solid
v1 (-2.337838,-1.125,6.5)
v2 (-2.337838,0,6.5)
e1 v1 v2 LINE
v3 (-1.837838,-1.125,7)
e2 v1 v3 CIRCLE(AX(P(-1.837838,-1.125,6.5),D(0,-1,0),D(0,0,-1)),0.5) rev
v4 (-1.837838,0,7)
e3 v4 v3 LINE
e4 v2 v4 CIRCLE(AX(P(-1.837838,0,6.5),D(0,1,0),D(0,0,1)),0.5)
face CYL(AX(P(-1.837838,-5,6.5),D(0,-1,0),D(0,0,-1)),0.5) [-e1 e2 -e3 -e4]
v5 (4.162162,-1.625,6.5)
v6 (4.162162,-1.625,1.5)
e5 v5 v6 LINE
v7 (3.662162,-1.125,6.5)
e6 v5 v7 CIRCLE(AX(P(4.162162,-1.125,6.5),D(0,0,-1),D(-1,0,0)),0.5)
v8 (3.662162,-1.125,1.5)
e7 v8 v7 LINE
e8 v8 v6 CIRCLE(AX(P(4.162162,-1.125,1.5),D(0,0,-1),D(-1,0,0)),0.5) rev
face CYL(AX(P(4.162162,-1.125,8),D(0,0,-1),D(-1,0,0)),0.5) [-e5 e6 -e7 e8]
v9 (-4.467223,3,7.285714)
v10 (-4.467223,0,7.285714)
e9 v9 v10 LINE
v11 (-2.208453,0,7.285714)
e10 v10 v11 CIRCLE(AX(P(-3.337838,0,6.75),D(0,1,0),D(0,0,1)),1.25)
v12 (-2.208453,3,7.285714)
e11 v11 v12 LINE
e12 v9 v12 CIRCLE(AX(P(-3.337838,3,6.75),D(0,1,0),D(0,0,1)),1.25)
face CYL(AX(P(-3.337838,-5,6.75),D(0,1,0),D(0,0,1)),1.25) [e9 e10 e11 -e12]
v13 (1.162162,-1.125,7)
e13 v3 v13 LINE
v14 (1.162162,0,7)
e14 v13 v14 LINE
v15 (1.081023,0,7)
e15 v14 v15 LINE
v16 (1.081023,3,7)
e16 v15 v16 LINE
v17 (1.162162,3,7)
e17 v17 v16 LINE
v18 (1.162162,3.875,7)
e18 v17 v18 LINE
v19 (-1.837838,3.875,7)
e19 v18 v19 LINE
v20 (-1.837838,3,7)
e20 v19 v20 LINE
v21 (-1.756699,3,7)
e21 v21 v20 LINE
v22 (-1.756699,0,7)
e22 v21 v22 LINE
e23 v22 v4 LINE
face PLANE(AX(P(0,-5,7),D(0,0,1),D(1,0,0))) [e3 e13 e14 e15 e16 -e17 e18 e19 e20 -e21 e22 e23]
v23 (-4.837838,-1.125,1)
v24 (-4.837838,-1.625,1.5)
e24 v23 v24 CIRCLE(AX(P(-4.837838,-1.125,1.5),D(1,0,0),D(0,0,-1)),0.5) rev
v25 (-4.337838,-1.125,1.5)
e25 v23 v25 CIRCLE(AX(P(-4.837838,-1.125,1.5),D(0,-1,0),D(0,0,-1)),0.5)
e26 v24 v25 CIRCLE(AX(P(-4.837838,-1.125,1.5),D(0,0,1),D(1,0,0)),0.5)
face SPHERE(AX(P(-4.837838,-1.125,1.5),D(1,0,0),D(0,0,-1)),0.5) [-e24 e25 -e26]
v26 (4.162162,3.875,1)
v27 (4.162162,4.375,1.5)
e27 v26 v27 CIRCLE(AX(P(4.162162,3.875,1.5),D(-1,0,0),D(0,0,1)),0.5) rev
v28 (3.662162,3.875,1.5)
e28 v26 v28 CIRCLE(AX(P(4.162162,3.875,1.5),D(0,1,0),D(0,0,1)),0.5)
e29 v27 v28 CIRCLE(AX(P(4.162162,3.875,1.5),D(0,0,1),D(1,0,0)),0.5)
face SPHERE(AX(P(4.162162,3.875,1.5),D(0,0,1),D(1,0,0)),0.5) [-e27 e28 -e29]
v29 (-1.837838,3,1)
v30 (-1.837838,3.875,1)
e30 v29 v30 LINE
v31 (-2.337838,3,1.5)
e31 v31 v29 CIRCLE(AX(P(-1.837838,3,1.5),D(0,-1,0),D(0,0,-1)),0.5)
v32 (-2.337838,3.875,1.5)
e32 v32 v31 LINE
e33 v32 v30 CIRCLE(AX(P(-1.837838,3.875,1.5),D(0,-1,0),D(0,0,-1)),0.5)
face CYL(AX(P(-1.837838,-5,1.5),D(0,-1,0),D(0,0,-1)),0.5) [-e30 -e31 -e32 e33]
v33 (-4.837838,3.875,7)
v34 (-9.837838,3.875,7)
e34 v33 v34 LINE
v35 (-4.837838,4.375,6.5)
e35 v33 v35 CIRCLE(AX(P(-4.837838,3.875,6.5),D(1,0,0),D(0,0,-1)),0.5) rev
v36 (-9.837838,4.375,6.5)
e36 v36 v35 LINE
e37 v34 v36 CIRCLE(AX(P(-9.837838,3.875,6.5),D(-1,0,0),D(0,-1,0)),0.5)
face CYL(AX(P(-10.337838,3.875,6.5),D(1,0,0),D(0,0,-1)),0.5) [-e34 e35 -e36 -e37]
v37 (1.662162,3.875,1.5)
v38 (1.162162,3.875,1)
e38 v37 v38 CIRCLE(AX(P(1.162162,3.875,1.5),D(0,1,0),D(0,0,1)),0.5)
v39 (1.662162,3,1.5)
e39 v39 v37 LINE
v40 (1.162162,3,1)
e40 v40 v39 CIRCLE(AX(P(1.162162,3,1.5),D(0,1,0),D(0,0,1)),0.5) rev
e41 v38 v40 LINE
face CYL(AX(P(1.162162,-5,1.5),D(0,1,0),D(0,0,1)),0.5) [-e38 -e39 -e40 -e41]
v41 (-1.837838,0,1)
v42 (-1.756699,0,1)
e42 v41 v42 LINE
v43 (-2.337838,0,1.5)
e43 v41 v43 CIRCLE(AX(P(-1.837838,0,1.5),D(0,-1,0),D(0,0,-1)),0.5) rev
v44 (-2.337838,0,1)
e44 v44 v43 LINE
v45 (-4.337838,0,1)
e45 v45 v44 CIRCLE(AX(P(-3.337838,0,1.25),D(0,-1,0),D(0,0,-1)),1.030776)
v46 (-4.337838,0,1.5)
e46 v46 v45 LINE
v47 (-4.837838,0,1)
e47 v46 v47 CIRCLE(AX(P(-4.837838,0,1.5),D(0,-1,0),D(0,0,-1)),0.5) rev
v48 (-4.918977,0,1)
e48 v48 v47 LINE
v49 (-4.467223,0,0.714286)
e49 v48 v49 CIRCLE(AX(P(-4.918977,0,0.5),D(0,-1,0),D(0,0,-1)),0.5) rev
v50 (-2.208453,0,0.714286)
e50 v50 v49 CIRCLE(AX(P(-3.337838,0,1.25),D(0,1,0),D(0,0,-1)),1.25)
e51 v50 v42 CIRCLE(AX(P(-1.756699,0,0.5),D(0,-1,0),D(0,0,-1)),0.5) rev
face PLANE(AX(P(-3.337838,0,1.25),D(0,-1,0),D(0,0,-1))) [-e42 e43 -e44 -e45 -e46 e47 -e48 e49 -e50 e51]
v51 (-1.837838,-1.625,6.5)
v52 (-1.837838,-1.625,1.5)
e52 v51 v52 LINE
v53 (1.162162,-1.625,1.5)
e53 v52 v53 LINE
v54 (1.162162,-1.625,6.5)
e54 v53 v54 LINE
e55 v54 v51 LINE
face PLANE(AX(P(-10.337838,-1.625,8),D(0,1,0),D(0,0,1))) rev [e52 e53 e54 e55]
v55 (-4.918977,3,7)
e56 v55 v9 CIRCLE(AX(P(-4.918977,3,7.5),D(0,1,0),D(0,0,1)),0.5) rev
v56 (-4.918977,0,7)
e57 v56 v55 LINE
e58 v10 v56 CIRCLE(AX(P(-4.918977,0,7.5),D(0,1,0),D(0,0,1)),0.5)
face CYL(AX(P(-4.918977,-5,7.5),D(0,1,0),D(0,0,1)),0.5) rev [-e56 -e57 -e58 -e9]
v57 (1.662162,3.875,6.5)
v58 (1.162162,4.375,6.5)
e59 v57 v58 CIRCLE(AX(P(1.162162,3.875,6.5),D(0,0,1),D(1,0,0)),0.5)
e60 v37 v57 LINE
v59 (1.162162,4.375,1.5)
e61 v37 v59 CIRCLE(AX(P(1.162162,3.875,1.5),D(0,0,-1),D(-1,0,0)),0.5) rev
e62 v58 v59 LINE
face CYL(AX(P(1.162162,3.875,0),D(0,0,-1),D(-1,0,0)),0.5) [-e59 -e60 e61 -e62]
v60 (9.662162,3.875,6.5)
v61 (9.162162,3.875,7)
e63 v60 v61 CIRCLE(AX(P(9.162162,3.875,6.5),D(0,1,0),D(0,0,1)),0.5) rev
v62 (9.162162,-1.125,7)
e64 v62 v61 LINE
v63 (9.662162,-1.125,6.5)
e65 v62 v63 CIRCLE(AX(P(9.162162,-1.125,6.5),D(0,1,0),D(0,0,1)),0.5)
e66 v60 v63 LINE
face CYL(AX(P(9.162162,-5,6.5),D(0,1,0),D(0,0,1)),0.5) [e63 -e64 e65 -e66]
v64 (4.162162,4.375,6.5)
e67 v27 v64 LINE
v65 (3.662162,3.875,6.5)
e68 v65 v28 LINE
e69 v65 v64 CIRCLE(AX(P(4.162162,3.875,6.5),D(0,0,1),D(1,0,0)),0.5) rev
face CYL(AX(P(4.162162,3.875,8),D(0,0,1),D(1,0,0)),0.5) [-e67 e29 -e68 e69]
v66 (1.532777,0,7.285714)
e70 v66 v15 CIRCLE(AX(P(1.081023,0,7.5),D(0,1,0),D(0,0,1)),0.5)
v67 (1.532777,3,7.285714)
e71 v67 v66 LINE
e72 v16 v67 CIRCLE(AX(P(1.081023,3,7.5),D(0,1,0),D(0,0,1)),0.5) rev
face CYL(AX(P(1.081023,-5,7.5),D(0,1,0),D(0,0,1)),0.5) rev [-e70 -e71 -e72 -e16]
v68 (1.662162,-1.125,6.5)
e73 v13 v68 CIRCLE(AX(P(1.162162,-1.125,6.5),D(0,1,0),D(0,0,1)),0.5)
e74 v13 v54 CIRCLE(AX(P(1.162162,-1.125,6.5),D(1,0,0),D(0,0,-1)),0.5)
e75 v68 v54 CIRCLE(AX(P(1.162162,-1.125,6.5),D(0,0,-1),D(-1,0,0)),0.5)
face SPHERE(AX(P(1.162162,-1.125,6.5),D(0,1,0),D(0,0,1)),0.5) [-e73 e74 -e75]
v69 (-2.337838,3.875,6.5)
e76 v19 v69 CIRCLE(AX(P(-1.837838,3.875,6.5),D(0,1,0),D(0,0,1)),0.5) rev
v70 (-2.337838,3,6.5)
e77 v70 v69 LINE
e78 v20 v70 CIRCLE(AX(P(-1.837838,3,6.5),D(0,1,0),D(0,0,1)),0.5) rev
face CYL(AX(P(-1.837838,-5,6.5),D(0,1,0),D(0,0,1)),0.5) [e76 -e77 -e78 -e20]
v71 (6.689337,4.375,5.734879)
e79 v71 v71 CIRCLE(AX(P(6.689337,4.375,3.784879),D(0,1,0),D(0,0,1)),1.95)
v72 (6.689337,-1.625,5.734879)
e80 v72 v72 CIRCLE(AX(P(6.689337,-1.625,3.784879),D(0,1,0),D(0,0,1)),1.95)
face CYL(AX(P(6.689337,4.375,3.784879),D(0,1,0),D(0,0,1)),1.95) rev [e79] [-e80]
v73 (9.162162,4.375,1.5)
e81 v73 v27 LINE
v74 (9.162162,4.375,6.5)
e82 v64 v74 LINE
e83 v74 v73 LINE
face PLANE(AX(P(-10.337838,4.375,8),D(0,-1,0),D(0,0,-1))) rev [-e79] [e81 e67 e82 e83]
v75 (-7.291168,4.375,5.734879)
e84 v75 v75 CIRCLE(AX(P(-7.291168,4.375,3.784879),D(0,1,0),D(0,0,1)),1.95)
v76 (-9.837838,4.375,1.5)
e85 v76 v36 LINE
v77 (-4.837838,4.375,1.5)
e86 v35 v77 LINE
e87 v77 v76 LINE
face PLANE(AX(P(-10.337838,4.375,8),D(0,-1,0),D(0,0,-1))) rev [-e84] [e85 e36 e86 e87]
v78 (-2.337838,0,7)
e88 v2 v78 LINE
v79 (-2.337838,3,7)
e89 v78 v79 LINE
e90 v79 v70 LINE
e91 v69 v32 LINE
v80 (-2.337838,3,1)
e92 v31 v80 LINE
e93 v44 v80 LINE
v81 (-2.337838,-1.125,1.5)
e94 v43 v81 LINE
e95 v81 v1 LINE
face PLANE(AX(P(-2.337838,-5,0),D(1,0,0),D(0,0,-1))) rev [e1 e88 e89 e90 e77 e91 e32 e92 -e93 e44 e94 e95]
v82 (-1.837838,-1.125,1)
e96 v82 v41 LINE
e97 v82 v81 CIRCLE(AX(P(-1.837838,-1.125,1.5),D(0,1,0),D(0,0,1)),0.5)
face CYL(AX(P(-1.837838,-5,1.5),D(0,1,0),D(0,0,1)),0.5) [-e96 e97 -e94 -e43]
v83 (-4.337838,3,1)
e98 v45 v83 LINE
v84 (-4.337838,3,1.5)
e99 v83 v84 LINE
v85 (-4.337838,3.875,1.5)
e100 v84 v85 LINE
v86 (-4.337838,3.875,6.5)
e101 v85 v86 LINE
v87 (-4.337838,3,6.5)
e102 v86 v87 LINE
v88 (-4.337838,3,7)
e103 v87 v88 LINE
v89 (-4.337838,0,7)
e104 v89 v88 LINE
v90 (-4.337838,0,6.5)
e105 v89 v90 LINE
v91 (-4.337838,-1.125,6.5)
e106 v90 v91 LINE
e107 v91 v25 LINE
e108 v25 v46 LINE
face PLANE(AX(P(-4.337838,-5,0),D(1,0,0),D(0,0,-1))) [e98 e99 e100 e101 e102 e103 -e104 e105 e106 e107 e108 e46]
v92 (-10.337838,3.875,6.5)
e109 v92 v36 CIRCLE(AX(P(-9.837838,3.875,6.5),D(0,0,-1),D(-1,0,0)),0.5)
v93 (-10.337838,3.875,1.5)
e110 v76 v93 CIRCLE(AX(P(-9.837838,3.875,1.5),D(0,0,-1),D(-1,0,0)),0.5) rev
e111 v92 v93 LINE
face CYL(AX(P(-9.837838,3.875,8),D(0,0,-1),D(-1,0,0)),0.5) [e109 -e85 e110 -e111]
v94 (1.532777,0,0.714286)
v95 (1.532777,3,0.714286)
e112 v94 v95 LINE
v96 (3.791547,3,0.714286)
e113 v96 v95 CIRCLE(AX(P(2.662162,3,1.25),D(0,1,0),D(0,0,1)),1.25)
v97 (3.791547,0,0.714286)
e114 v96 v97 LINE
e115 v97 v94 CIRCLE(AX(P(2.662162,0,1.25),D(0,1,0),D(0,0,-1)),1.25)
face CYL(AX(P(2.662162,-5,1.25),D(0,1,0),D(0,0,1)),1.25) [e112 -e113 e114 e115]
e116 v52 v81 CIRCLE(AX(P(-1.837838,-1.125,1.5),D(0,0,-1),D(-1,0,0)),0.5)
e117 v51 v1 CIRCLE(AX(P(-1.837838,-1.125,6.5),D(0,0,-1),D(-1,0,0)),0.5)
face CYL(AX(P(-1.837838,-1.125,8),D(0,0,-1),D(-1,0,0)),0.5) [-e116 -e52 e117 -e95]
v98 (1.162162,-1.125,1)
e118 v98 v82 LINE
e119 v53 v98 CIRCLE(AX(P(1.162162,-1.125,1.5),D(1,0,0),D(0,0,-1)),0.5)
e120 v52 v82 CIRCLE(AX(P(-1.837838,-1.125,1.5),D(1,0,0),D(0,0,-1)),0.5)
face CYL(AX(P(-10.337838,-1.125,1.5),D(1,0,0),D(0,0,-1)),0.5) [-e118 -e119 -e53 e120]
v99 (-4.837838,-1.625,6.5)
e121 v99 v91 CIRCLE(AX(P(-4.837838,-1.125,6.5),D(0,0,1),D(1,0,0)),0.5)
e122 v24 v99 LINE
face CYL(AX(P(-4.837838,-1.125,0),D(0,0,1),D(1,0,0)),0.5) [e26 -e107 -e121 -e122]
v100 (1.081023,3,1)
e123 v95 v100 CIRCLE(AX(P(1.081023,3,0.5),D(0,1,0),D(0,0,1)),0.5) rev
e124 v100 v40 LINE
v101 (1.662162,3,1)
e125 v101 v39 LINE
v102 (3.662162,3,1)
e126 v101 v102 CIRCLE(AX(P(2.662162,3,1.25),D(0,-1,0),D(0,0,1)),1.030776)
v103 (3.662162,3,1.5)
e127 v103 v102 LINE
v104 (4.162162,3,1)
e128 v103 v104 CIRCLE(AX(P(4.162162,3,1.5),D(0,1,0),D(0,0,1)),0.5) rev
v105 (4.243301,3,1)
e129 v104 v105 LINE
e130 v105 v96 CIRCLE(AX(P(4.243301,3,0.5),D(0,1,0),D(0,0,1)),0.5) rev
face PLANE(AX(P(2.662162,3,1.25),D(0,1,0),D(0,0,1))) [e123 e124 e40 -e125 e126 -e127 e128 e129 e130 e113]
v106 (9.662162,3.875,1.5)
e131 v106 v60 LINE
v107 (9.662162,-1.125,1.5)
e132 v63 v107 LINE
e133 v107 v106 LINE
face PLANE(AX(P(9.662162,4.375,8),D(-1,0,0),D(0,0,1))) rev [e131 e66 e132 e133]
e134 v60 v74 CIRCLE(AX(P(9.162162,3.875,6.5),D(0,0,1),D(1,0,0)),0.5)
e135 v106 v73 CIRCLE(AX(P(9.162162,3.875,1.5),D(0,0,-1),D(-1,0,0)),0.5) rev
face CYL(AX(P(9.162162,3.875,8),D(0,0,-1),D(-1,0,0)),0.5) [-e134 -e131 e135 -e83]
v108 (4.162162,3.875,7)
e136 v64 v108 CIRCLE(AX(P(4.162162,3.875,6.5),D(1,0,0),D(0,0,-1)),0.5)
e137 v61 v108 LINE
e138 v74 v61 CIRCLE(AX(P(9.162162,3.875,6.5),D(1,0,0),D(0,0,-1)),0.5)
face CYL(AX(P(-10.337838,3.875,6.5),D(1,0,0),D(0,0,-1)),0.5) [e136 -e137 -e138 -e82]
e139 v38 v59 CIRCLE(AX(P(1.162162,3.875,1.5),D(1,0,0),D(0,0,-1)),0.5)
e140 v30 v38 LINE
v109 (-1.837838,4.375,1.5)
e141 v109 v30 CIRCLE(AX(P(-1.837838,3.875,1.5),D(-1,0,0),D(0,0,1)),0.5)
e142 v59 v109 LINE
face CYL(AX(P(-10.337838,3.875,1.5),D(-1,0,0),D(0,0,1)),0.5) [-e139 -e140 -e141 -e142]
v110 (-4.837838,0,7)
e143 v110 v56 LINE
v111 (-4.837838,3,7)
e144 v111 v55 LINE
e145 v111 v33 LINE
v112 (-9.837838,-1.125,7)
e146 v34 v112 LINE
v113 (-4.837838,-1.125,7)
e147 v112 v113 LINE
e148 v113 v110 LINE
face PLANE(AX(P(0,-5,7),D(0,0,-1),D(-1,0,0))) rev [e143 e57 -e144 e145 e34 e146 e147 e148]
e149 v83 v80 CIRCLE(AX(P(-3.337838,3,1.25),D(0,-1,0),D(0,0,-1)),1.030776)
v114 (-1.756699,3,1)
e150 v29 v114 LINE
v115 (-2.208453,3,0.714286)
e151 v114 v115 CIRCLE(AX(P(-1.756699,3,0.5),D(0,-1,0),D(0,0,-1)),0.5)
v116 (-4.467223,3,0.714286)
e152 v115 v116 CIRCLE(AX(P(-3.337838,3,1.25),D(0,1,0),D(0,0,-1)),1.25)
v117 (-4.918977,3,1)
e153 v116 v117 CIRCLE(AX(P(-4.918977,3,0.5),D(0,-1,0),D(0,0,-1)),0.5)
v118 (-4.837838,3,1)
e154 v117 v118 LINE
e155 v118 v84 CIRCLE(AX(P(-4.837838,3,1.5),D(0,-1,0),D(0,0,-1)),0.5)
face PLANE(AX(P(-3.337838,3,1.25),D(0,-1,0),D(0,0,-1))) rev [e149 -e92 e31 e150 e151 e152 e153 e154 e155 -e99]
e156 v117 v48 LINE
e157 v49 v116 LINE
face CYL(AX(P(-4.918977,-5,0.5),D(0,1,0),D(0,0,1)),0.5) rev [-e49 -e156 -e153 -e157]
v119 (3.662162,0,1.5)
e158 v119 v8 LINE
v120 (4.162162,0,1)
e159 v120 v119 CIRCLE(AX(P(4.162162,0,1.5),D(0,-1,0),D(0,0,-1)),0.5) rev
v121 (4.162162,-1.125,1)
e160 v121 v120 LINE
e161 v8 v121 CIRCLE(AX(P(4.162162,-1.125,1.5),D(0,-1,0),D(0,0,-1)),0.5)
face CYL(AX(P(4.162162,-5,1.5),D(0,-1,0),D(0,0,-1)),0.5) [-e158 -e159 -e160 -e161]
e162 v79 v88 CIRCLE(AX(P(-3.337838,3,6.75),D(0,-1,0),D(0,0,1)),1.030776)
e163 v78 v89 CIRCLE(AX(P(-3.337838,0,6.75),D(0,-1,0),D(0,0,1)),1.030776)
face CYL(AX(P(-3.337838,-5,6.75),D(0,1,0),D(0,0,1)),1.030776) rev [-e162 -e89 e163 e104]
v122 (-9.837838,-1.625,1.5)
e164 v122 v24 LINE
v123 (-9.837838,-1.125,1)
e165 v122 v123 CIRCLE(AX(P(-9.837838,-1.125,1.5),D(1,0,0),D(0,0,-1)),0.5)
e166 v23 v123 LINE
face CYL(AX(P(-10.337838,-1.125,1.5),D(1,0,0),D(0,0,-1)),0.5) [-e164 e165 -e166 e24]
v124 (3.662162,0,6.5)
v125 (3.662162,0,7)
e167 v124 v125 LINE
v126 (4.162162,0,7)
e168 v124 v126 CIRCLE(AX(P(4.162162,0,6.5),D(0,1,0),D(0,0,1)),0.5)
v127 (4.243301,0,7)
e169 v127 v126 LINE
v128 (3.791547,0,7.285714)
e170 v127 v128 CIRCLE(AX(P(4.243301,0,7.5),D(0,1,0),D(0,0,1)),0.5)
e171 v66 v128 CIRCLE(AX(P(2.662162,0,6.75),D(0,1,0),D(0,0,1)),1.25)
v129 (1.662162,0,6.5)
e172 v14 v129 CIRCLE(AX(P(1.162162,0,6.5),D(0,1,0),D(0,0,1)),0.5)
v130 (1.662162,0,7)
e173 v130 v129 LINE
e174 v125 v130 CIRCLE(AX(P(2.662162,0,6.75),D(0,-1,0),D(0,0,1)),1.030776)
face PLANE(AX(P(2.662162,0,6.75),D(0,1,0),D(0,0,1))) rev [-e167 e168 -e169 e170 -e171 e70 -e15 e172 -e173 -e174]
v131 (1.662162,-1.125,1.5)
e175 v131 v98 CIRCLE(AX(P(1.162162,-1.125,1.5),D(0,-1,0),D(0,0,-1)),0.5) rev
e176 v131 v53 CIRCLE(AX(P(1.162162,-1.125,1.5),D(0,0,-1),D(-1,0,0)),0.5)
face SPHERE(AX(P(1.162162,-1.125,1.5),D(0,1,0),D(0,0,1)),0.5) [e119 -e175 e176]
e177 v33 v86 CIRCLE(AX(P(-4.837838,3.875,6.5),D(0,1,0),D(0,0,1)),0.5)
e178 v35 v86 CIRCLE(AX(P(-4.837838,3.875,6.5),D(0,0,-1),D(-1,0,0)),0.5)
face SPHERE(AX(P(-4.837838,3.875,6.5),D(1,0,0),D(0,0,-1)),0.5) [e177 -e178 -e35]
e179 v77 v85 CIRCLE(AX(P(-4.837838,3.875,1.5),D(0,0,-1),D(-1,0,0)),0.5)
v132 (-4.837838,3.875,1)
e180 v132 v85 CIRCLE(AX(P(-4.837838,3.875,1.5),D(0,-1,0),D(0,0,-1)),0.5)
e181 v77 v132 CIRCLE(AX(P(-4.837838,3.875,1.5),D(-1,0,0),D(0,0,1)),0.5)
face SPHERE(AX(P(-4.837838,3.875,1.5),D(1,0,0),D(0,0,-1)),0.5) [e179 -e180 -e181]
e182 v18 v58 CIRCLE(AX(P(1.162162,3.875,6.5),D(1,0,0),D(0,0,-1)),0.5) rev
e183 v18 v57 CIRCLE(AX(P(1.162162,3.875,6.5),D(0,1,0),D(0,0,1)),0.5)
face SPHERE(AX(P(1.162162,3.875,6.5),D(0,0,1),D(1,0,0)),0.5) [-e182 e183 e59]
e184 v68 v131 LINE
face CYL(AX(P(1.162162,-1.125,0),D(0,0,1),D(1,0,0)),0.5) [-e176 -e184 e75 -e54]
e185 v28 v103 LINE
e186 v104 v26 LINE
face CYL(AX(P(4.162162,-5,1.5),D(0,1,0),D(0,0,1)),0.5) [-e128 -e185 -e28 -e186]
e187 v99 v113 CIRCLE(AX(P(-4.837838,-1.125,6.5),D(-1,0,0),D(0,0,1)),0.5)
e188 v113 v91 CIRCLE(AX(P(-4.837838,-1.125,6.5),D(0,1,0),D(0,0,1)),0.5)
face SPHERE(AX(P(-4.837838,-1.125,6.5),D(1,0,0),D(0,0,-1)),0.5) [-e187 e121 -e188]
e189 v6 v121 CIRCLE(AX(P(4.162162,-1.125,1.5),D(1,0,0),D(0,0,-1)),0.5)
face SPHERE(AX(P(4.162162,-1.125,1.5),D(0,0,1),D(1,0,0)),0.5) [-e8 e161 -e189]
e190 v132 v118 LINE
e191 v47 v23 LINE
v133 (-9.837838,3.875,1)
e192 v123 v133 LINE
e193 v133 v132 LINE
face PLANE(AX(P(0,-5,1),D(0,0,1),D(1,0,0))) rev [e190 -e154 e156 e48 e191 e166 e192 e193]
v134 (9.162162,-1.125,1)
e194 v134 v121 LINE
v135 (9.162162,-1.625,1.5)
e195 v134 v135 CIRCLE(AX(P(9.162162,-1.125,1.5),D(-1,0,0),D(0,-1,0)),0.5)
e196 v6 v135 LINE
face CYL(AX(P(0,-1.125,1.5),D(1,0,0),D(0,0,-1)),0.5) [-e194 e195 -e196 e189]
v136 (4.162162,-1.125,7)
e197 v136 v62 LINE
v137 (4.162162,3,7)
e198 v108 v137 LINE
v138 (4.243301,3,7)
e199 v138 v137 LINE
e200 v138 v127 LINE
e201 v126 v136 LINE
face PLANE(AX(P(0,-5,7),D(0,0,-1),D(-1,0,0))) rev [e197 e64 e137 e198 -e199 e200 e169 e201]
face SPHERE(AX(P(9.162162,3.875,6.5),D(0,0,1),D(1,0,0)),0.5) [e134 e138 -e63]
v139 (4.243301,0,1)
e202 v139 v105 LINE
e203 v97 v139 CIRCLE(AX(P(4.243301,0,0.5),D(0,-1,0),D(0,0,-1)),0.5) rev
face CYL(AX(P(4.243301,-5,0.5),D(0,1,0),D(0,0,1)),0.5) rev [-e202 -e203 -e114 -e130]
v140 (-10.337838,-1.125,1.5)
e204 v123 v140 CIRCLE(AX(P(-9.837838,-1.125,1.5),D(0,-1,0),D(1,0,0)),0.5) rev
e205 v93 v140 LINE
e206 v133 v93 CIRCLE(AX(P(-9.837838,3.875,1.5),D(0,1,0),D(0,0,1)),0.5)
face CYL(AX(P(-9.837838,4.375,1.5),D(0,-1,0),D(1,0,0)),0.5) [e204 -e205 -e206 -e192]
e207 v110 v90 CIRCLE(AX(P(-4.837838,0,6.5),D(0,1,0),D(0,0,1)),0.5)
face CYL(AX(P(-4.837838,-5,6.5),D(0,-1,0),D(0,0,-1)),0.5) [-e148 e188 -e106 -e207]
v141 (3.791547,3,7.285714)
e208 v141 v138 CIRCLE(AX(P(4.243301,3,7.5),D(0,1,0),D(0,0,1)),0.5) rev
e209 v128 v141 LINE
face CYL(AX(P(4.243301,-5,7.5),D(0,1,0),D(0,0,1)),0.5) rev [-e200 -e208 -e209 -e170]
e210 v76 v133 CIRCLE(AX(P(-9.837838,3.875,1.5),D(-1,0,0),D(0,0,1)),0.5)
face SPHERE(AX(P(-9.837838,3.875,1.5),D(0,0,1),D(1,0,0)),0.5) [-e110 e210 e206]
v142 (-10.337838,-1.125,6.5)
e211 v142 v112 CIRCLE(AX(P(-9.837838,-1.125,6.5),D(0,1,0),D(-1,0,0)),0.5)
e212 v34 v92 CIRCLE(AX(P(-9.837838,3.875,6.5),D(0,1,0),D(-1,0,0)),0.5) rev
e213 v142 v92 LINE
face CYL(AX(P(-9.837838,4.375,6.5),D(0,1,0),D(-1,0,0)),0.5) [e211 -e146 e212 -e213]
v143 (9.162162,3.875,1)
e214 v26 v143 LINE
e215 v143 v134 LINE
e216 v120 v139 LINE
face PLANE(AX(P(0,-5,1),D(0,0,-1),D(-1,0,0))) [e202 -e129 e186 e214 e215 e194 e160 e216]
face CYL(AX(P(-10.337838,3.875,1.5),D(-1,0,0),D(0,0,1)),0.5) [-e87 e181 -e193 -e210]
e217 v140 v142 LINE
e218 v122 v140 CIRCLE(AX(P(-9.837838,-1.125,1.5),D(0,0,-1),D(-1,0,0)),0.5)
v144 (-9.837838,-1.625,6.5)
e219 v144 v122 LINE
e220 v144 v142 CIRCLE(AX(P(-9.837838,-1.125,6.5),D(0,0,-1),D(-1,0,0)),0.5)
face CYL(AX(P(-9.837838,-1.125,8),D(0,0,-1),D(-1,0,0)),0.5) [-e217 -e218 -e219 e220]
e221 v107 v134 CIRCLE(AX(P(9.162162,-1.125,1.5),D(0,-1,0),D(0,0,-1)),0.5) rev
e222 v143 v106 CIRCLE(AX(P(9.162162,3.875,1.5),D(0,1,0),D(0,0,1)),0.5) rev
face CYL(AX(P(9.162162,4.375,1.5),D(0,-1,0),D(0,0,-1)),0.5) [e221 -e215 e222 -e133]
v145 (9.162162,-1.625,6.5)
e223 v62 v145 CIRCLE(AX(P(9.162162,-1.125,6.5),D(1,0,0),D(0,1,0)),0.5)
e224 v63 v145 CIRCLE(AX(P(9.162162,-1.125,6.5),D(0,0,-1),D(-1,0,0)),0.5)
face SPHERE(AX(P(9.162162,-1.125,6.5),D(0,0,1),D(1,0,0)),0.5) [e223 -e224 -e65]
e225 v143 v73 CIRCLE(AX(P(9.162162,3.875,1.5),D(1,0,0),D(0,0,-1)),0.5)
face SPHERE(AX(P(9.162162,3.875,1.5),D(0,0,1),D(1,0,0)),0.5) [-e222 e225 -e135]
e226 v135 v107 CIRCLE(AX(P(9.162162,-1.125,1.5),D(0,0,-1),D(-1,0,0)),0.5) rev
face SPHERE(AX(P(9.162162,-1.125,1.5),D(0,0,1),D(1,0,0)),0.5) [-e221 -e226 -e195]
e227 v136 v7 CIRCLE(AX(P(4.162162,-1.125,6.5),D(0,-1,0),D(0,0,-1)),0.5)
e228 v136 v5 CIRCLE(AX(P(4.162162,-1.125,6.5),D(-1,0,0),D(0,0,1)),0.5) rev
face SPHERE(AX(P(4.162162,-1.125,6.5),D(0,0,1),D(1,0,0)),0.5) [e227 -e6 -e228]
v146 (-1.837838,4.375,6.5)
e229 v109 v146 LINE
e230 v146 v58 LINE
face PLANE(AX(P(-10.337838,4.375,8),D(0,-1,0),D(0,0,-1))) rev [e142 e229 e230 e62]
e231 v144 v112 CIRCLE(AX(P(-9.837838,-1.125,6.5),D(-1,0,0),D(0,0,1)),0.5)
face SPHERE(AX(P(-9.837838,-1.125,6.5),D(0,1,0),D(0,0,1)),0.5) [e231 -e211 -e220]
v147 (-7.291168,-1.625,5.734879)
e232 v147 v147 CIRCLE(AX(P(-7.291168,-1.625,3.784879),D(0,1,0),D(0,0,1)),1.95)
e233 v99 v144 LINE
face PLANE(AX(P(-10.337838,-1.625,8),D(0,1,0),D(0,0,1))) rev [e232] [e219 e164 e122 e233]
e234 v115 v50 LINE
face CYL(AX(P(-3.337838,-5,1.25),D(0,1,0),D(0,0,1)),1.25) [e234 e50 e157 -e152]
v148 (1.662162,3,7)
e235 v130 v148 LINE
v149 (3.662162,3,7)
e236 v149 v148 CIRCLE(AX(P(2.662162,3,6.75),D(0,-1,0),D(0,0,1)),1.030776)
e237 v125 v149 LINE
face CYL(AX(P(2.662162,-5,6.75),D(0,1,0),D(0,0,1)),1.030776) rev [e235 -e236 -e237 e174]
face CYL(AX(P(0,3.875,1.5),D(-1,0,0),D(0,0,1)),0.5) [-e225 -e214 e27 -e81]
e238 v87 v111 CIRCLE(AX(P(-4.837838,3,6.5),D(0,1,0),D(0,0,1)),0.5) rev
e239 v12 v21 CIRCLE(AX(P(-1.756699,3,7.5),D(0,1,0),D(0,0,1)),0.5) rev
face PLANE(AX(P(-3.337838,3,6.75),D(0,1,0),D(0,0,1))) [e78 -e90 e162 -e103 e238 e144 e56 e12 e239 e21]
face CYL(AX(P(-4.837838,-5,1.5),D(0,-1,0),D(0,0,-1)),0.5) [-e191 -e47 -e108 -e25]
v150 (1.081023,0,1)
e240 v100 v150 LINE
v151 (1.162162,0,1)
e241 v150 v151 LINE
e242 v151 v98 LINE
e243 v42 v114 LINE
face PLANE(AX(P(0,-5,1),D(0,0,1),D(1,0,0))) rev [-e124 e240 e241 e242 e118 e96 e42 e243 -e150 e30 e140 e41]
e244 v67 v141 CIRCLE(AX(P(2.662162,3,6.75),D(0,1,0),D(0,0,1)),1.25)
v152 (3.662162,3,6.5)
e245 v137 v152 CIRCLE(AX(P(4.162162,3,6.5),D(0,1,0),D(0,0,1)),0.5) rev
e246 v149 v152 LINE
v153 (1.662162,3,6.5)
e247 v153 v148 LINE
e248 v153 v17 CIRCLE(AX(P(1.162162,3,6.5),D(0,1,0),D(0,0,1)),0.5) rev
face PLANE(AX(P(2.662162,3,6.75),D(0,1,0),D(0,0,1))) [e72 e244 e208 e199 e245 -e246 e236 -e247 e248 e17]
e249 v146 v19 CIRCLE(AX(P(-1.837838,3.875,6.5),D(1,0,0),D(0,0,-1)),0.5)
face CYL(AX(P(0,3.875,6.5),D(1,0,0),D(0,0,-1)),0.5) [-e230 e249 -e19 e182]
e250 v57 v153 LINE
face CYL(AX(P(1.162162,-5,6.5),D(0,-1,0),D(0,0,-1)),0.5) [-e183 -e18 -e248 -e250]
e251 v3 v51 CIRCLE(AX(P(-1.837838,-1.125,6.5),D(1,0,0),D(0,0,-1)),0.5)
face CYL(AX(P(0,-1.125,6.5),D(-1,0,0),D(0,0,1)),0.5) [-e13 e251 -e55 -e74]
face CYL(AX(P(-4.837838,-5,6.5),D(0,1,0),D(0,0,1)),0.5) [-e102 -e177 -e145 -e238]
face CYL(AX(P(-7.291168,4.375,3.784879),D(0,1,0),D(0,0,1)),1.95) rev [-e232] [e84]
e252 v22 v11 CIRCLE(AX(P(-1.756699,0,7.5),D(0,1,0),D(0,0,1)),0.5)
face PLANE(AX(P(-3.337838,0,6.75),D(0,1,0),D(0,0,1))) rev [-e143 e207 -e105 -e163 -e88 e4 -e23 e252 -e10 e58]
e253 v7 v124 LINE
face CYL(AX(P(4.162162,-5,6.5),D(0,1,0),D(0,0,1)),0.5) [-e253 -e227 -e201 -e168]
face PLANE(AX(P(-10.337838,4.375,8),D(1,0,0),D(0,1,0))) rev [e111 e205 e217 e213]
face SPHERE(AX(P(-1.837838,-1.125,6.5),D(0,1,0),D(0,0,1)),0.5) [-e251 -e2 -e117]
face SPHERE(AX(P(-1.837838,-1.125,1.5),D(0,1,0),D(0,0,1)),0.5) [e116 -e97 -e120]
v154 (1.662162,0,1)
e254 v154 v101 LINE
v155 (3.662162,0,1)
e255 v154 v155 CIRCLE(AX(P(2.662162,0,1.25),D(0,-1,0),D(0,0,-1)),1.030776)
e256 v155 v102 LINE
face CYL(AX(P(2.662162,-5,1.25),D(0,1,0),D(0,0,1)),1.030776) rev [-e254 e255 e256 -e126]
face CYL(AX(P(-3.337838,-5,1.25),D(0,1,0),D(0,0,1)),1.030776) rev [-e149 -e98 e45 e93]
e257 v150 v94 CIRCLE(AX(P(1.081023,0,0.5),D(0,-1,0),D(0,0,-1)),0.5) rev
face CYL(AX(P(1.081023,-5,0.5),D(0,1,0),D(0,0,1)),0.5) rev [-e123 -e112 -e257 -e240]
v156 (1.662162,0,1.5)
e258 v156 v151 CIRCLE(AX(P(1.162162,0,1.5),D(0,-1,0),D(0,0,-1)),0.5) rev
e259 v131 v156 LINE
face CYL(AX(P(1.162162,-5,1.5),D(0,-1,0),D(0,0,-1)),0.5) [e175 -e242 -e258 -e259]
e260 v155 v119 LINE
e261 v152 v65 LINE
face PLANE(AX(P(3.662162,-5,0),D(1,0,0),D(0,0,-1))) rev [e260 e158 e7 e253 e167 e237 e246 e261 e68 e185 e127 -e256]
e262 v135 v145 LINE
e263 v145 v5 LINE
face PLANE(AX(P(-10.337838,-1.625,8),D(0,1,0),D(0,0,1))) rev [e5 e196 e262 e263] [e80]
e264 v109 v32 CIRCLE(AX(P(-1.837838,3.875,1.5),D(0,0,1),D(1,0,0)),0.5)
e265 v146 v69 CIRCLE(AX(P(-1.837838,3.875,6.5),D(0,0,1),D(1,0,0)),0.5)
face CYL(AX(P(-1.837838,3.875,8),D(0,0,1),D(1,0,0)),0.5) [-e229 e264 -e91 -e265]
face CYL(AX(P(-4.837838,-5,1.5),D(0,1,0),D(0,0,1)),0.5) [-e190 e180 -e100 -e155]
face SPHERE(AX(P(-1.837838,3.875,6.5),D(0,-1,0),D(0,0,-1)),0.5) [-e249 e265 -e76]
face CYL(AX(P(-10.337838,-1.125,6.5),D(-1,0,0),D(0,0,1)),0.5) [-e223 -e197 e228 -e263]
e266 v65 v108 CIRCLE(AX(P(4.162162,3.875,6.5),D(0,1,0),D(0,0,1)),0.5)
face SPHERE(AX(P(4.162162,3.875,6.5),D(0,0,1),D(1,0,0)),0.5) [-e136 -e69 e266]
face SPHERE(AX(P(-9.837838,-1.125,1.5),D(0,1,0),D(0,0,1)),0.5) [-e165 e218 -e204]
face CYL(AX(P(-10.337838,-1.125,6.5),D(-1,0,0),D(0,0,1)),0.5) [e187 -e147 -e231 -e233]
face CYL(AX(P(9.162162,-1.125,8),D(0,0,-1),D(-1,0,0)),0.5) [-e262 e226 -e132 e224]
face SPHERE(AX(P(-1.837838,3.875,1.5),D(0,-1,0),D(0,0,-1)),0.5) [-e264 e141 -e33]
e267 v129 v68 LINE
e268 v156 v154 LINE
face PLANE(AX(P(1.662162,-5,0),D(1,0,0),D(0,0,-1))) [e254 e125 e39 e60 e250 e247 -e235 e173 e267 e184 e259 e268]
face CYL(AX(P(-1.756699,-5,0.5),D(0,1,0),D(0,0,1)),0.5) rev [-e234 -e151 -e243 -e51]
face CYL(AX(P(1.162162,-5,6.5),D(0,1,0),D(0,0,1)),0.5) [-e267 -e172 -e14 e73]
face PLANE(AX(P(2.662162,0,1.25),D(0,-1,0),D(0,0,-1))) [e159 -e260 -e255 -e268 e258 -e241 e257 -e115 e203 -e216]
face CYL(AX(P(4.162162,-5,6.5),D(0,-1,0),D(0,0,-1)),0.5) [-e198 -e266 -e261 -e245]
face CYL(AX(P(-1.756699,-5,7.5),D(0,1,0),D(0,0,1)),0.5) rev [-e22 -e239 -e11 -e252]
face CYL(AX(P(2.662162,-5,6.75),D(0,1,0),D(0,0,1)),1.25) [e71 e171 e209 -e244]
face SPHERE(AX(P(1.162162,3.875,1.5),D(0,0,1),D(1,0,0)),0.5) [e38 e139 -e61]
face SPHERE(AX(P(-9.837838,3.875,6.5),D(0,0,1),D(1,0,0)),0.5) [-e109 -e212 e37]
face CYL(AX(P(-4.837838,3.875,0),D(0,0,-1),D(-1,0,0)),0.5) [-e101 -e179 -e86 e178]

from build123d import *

# Parameters (mm, degrees)
SKETCH_1_W           = 20
SKETCH_1_H           = 6
EXTRUDE_3_DEPTH      = 8
CUT_EXTRUDE_4_DEPTH  = 5
CUT_EXTRUDE_6_DEPTH  = 14.865839901
CUT_EXTRUDE_7_DEPTH  = 14.784466481
HOLE_WIZARD_M3_5_1_D = 3.9
FILLET_4_R           = 0.5
FILLET_5_R           = 0.5
FILLET_6_R           = 0.5
FILLET_7_R           = 0.5
FILLET_8_R           = 0.5
FILLET_9_R           = 0.5
FILLET_10_R          = 0.5
FILLET_11_R          = 0.5
FILLET_12_R          = 0.5
FILLET_13_R          = 0.5
FILLET_14_R          = 0.5
FILLET_15_R          = 0.5
FILLET_16_R          = 0.5
FILLET_18_R          = 0.5
FILLET_19_R          = 0.5
FILLET_20_R          = 0.5


with BuildPart() as part:
    # 草图1 → 凸台-拉伸3 (new body)
    with BuildSketch(Plane.XY):
        with Locations((-0.337837838, 1.375)):
            Rectangle(SKETCH_1_W, SKETCH_1_H)
    extrude(amount=EXTRUDE_3_DEPTH)

    # 草图4 → 切除-拉伸4 (cut, symmetric)
    with BuildSketch(Plane(origin=(0, 0, 0), x_dir=(1, 0, 0), z_dir=(0, 1, 0))):
        with BuildLine():
            Line((-10.337837838, -1), (-4.562582709, -1))
            ThreePointArc((-4.562582709, -1), (-4.477957321, -0.737527987), (-4.337837838, -0.5))
            Line((-4.337837838, -0.5), (-4.337837838, 0))
            Line((-4.337837838, 0), (-10.337837838, 0))
            Line((-10.337837838, 0), (-10.337837838, -1))
        make_face()
        with BuildLine():
            Line((-10.337837838, -8), (-4.337837838, -8))
            Line((-4.337837838, -8), (-4.337837838, -7.5))
            ThreePointArc((-4.337837838, -7.5), (-4.477957321, -7.262472013), (-4.562582709, -7))
            Line((-4.562582709, -7), (-10.337837838, -7))
            Line((-10.337837838, -7), (-10.337837838, -8))
        make_face()
        with BuildLine():
            Line((-4.337837838, -8), (-3.337837838, -8))
            ThreePointArc((-3.337837838, -8), (-3.896854832, -7.868033989), (-4.337837838, -7.5))
            Line((-4.337837838, -7.5), (-4.337837838, -8))
        make_face()
        with BuildLine():
            Line((-3.337837838, -8), (-2.337837838, -8))
            Line((-2.337837838, -8), (-2.337837838, -7.5))
            ThreePointArc((-2.337837838, -7.5), (-2.778820843, -7.868033989), (-3.337837838, -8))
        make_face()
        with BuildLine():
            Line((-0.337837838, -8), (1.662162162, -8))
            Line((1.662162162, -8), (1.662162162, -7.5))
            ThreePointArc((1.662162162, -7.5), (1.522042679, -7.262472013), (1.437417291, -7))
            Line((1.437417291, -7), (-2.113092966, -7))
            ThreePointArc((-2.113092966, -7), (-2.197718355, -7.262472013), (-2.337837838, -7.5))
            Line((-2.337837838, -7.5), (-2.337837838, -8))
            Line((-2.337837838, -8), (-0.337837838, -8))
        make_face()
        with BuildLine():
            Line((1.662162162, -8), (2.662162162, -8))
            ThreePointArc((2.662162162, -8), (2.103145168, -7.868033989), (1.662162162, -7.5))
            Line((1.662162162, -7.5), (1.662162162, -8))
        make_face()
        with BuildLine():
            Line((2.662162162, -8), (3.662162162, -8))
            Line((3.662162162, -8), (3.662162162, -7.5))
            ThreePointArc((3.662162162, -7.5), (3.221179157, -7.868033989), (2.662162162, -8))
        make_face()
        with BuildLine():
            Line((3.662162162, -8), (9.662162162, -8))
            Line((9.662162162, -8), (9.662162162, -7))
            Line((9.662162162, -7), (3.886907034, -7))
            ThreePointArc((3.886907034, -7), (3.802281645, -7.262472013), (3.662162162, -7.5))
            Line((3.662162162, -7.5), (3.662162162, -8))
        make_face()
        with BuildLine():
            ThreePointArc((3.662162162, -0.5), (3.802281645, -0.737527987), (3.886907034, -1))
            Line((3.886907034, -1), (9.662162162, -1))
            Line((9.662162162, -1), (9.662162162, 0))
            Line((9.662162162, 0), (3.662162162, 0))
            Line((3.662162162, 0), (3.662162162, -0.5))
        make_face()
        with BuildLine():
            ThreePointArc((2.662162162, 0), (3.221179157, -0.131966011), (3.662162162, -0.5))
            Line((3.662162162, -0.5), (3.662162162, 0))
            Line((3.662162162, 0), (2.662162162, 0))
        make_face()
        with BuildLine():
            Line((1.662162162, 0), (1.662162162, -0.5))
            ThreePointArc((1.662162162, -0.5), (2.103145168, -0.131966011), (2.662162162, 0))
            Line((2.662162162, 0), (1.662162162, 0))
        make_face()
        with BuildLine():
            Line((-2.113092966, -1), (1.437417291, -1))
            ThreePointArc((1.437417291, -1), (1.522042679, -0.737527987), (1.662162162, -0.5))
            Line((1.662162162, -0.5), (1.662162162, 0))
            Line((1.662162162, 0), (-2.337837838, 0))
            Line((-2.337837838, 0), (-2.337837838, -0.5))
            ThreePointArc((-2.337837838, -0.5), (-2.197718355, -0.737527987), (-2.113092966, -1))
        make_face()
        with BuildLine():
            ThreePointArc((-3.337837838, 0), (-2.778820843, -0.131966011), (-2.337837838, -0.5))
            Line((-2.337837838, -0.5), (-2.337837838, 0))
            Line((-2.337837838, 0), (-3.337837838, 0))
        make_face()
        with BuildLine():
            ThreePointArc((-4.337837838, -0.5), (-3.896854832, -0.131966011), (-3.337837838, 0))
            Line((-3.337837838, 0), (-4.337837838, 0))
            Line((-4.337837838, 0), (-4.337837838, -0.5))
        make_face()
        with BuildLine():
            Line((-4.337837838, -1), (-2.337837838, -1))
            ThreePointArc((-2.337837838, -1), (-3.337837838, -0.219223594), (-4.337837838, -1))
        make_face()
        with BuildLine():
            ThreePointArc((-4.337837838, -7), (-3.337837838, -7.780776406), (-2.337837838, -7))
            Line((-2.337837838, -7), (-4.337837838, -7))
        make_face()
        with BuildLine():
            ThreePointArc((1.662162162, -7), (2.662162162, -7.780776406), (3.662162162, -7))
            Line((3.662162162, -7), (2.662162162, -7))
            Line((2.662162162, -7), (1.662162162, -7))
        make_face()
        with BuildLine():
            Line((1.662162162, -1), (3.662162162, -1))
            ThreePointArc((3.662162162, -1), (2.662162162, -0.219223594), (1.662162162, -1))
        make_face()
        with BuildLine():
            ThreePointArc((-4.337837838, -1.5), (-3.337837838, -2.280776406), (-2.337837838, -1.5))
            Line((-2.337837838, -1.5), (-2.337837838, -1))
            Line((-2.337837838, -1), (-4.337837838, -1))
            Line((-4.337837838, -1), (-4.337837838, -1.5))
        make_face()
        with BuildLine():
            ThreePointArc((-4.337837838, -2), (-3.337837838, -2.5), (-2.337837838, -2))
            Line((-2.337837838, -2), (-2.337837838, -1.5))
            ThreePointArc((-2.337837838, -1.5), (-3.337837838, -2.280776406), (-4.337837838, -1.5))
            Line((-4.337837838, -1.5), (-4.337837838, -2))
        make_face()
        with BuildLine():
            ThreePointArc((-4.337837838, -6), (-3.337837838, -5.5), (-2.337837838, -6))
            Line((-2.337837838, -6), (-2.337837838, -2))
            ThreePointArc((-2.337837838, -2), (-3.337837838, -2.5), (-4.337837838, -2))
            Line((-4.337837838, -2), (-4.337837838, -6))
        make_face()
        with BuildLine():
            ThreePointArc((-4.337837838, -6.5), (-3.337837838, -5.719223594), (-2.337837838, -6.5))
            Line((-2.337837838, -6.5), (-2.337837838, -6))
            ThreePointArc((-2.337837838, -6), (-3.337837838, -5.5), (-4.337837838, -6))
            Line((-4.337837838, -6), (-4.337837838, -6.5))
        make_face()
        with BuildLine():
            Line((-4.337837838, -7), (-2.337837838, -7))
            Line((-2.337837838, -7), (-2.337837838, -6.5))
            ThreePointArc((-2.337837838, -6.5), (-3.337837838, -5.719223594), (-4.337837838, -6.5))
            Line((-4.337837838, -6.5), (-4.337837838, -7))
        make_face()
        with BuildLine():
            ThreePointArc((1.662162162, -6), (2.662162162, -5.5), (3.662162162, -6))
            Line((3.662162162, -6), (3.662162162, -2))
            ThreePointArc((3.662162162, -2), (2.662162162, -2.5), (1.662162162, -2))
            Line((1.662162162, -2), (1.662162162, -6))
        make_face()
        with BuildLine():
            ThreePointArc((1.662162162, -6.5), (2.662162162, -5.719223594), (3.662162162, -6.5))
            Line((3.662162162, -6.5), (3.662162162, -6))
            ThreePointArc((3.662162162, -6), (2.662162162, -5.5), (1.662162162, -6))
            Line((1.662162162, -6), (1.662162162, -6.5))
        make_face()
        with BuildLine():
            Line((2.662162162, -7), (3.662162162, -7))
            Line((3.662162162, -7), (3.662162162, -6.5))
            ThreePointArc((3.662162162, -6.5), (2.662162162, -5.719223594), (1.662162162, -6.5))
            Line((1.662162162, -6.5), (1.662162162, -7))
            Line((1.662162162, -7), (2.662162162, -7))
        make_face()
        with BuildLine():
            ThreePointArc((1.662162162, -2), (2.662162162, -2.5), (3.662162162, -2))
            Line((3.662162162, -2), (3.662162162, -1.5))
            ThreePointArc((3.662162162, -1.5), (2.662162162, -2.280776406), (1.662162162, -1.5))
            Line((1.662162162, -1.5), (1.662162162, -2))
        make_face()
        with BuildLine():
            ThreePointArc((1.662162162, -1.5), (2.662162162, -2.280776406), (3.662162162, -1.5))
            Line((3.662162162, -1.5), (3.662162162, -1))
            Line((3.662162162, -1), (1.662162162, -1))
            Line((1.662162162, -1), (1.662162162, -1.5))
        make_face()
    extrude(amount=CUT_EXTRUDE_4_DEPTH, both=True, mode=Mode.SUBTRACT)

    # 草图5 → 切除-拉伸6 (cut, through all)
    with BuildSketch(Plane(origin=(0, 3, 0), x_dir=(1, 0, 0), z_dir=(0, 1, 0))):
        with BuildLine():
            Line((-4.562582709, -7), (-4.337837838, -7))
            ThreePointArc((-4.337837838, -7), (-3.337837838, -7.780776406), (-2.337837838, -7))
            Line((-2.337837838, -7), (-2.113092966, -7))
            ThreePointArc((-2.113092966, -7), (-3.337837838, -8), (-4.562582709, -7))
        make_face()
        with BuildLine():
            Line((-4.562582709, -1), (-4.337837838, -1))
            ThreePointArc((-4.337837838, -1), (-3.337837838, -0.219223594), (-2.337837838, -1))
            Line((-2.337837838, -1), (-2.113092966, -1))
            ThreePointArc((-2.113092966, -1), (-3.337837838, 0), (-4.562582709, -1))
        make_face()
        with BuildLine():
            Line((1.437417291, -1), (1.662162162, -1))
            ThreePointArc((1.662162162, -1), (2.662162162, -0.219223594), (3.662162162, -1))
            Line((3.662162162, -1), (3.886907034, -1))
            ThreePointArc((3.886907034, -1), (2.662162162, 0), (1.437417291, -1))
        make_face()
        with BuildLine():
            Line((1.437417291, -7), (1.662162162, -7))
            ThreePointArc((1.662162162, -7), (2.662162162, -7.780776406), (3.662162162, -7))
            Line((3.662162162, -7), (3.886907034, -7))
            ThreePointArc((3.886907034, -7), (2.662162162, -8), (1.437417291, -7))
        make_face()
    extrude(amount=CUT_EXTRUDE_6_DEPTH, mode=Mode.SUBTRACT)

    # 草图7 → 切除-拉伸7 (cut, through all)
    with BuildSketch(Plane(origin=(0, 0, 0), x_dir=(1, 0, 0), z_dir=(0, 1, 0))):
        with BuildLine():
            Line((-4.562582709, -7), (-4.337837838, -7))
            ThreePointArc((-4.337837838, -7), (-3.337837838, -7.780776406), (-2.337837838, -7))
            Line((-2.337837838, -7), (-2.113092966, -7))
            ThreePointArc((-2.113092966, -7), (-3.337837838, -8), (-4.562582709, -7))
        make_face()
        with BuildLine():
            Line((1.437417291, -7), (1.662162162, -7))
            ThreePointArc((1.662162162, -7), (2.662162162, -7.780776406), (3.662162162, -7))
            Line((3.662162162, -7), (3.886907034, -7))
            ThreePointArc((3.886907034, -7), (2.662162162, -8), (1.437417291, -7))
        make_face()
        with BuildLine():
            Line((1.437417291, -1), (1.662162162, -1))
            ThreePointArc((1.662162162, -1), (2.662162162, -0.219223594), (3.662162162, -1))
            Line((3.662162162, -1), (3.886907034, -1))
            ThreePointArc((3.886907034, -1), (2.662162162, 0), (1.437417291, -1))
        make_face()
        with BuildLine():
            Line((-4.562582709, -1), (-4.337837838, -1))
            ThreePointArc((-4.337837838, -1), (-3.337837838, -0.219223594), (-2.337837838, -1))
            Line((-2.337837838, -1), (-2.113092966, -1))
            ThreePointArc((-2.113092966, -1), (-3.337837838, 0), (-4.562582709, -1))
        make_face()
    extrude(amount=-CUT_EXTRUDE_7_DEPTH, mode=Mode.SUBTRACT)

    # M3.5 间隙孔1 (through all)
    with Locations(Plane(origin=(0, 4.375, 0), x_dir=(1, 0, 0), z_dir=(0, 1, 0))):
        with Locations((-7.291168359, -3.784879217), (6.689336507, -3.784879217)):
            Hole(HOLE_WIZARD_M3_5_1_D / 2)

    # 圆角4
    fillet_4_edges = [part.edges().sort_by_distance(p)[0] for p in [
        (-10.337837838, 1.375, 1),
        (-10.337837838, 4.375, 4),
        (-7.337837838, 4.375, 1),
        (-10.337837838, 1.375, 7),
    ]]
    fillet(fillet_4_edges, radius=FILLET_4_R)

    # 圆角5
    # the kernel refuses this fillet: 0.5 mm, written as the material it takes off along each edge
    with BuildSketch(Plane(origin=(-9.837837838, 3.875, 6.5), x_dir=(0, 0, 1), z_dir=(0, 1, 0))) as fillet_5_piece_1_section:
        Polygon((0, 0), (FILLET_5_R, 0), (FILLET_5_R, -FILLET_5_R), (0, -FILLET_5_R), align=None)
    fillet_5_piece_1 = extrude(amount=FILLET_5_R, mode=Mode.PRIVATE)
    fillet_5_piece_1 = fillet_5_piece_1 - Plane(origin=(-9.837837838, 3.875, 6.5), x_dir=(0.7071067811865475, 0, -0.7071067811865475), z_dir=(0, 1, 0)) * Sphere(FILLET_5_R, mode=Mode.PRIVATE)
    add(fillet_5_piece_1, mode=Mode.SUBTRACT)
    with BuildSketch(Plane(origin=(-9.837837838, -1.625, 7), x_dir=(0, 1, 0), z_dir=(1, 0, 0)), Plane(origin=(-9.837837838, 4.375, 7), x_dir=(0, 0, -1), z_dir=(1, 0, 0)), Plane(origin=(-3.087837838, -1.625, 1), x_dir=(0, 1, 0), z_dir=(-1, 0, 0))) as fillet_5_piece_2:
        with BuildLine():
            CenterArc((FILLET_5_R, -FILLET_5_R), FILLET_5_R, 90, 90)
            Line((0, -FILLET_5_R), (0, 0))
            Line((0, 0), (FILLET_5_R, 0))
        make_face()
    extrude(amount=6.75, mode=Mode.SUBTRACT)
    with BuildSketch(Plane(origin=(-10.337837838, -1.625, 1.5), x_dir=(1, 0, 0), z_dir=(0, 0, 1))) as fillet_5_piece_3:
        with BuildLine():
            CenterArc((FILLET_5_R, FILLET_5_R), FILLET_5_R, 180, 90)
            Line((0, FILLET_5_R), (0, 0))
            Line((0, 0), (FILLET_5_R, 0))
        make_face()
    extrude(amount=5, mode=Mode.SUBTRACT)
    with BuildSketch(Plane(origin=(-9.837837838, -1.625, 1.5), x_dir=(0, 0, -1), z_dir=(1, 0, 0))) as fillet_5_piece_4:
        with BuildLine():
            CenterArc((0.5 - FILLET_5_R, FILLET_5_R), FILLET_5_R, 270, 90)
            Line((0.5, FILLET_5_R), (0.5, 0))
            Line((0.5, 0), (0.5 - FILLET_5_R, 0))
        make_face()
    revolve(axis=Axis((-9.837837838, -1.625, 1.5), (0, 1, 0)), revolution_arc=90, mode=Mode.SUBTRACT)
    with BuildSketch(Plane(origin=(-9.837837838, -1.625, 6.5), x_dir=(-1, 0, 0), z_dir=(0, 0, -1))) as fillet_5_piece_5:
        with BuildLine():
            CenterArc((0.5 - FILLET_5_R, FILLET_5_R), FILLET_5_R, 270, 90)
            Line((0.5, FILLET_5_R), (0.5, 0))
            Line((0.5, 0), (0.5 - FILLET_5_R, 0))
        make_face()
    revolve(axis=Axis((-9.837837838, -1.625, 6.5), (0, 1, 0)), revolution_arc=90, mode=Mode.SUBTRACT)

    # 圆角6
    fillet_6_edges = [part.edges().sort_by_distance(p)[0] for p in [
        (-4.562582709, 1.5, 7),
    ]]
    fillet(fillet_6_edges, radius=FILLET_6_R)

    # 圆角7
    fillet_7_edges = [part.edges().sort_by_distance(p)[0] for p in [
        (-2.113092966, 1.5, 7),
    ]]
    fillet(fillet_7_edges, radius=FILLET_7_R)

    # 圆角8
    fillet_8_edges = [part.edges().sort_by_distance(p)[0] for p in [
        (1.437417291, 1.5, 7),
    ]]
    fillet(fillet_8_edges, radius=FILLET_8_R)

    # 圆角9
    fillet_9_edges = [part.edges().sort_by_distance(p)[0] for p in [
        (3.886907034, 1.5, 7),
    ]]
    fillet(fillet_9_edges, radius=FILLET_9_R)

    # 圆角10
    fillet_10_edges = [part.edges().sort_by_distance(p)[0] for p in [
        (-4.562582709, 1.5, 1),
    ]]
    fillet(fillet_10_edges, radius=FILLET_10_R)

    # 圆角11
    fillet_11_edges = [part.edges().sort_by_distance(p)[0] for p in [
        (3.886907034, 1.5, 1),
        (-2.113092966, 1.5, 1),
    ]]
    fillet(fillet_11_edges, radius=FILLET_11_R)

    # 圆角12
    fillet_12_edges = [part.edges().sort_by_distance(p)[0] for p in [
        (1.437417291, 1.5, 1),
    ]]
    fillet(fillet_12_edges, radius=FILLET_12_R)

    # 圆角13
    fillet_13_edges = [part.edges().sort_by_distance(p)[0] for p in [
        (-4.337837838, 4.375, 4),
        (-4.337837838, 3.4375, 1),
        (-4.337837838, 4.228553391, 1.146446609),
        (-4.337837838, -1.625, 4),
        (-4.337837838, 3.4375, 7),
        (-4.337837838, -0.5625, 7),
        (-4.337837838, -0.5625, 1),
        (-4.337837838, 4.228553391, 6.853553391),
        (-4.337837838, -1.478553391, 6.853553391),
        (-4.337837838, -1.478553391, 1.146446609),
    ]]
    fillet(fillet_13_edges, radius=FILLET_13_R)

    # 圆角14
    fillet_14_edges = [part.edges().sort_by_distance(p)[0] for p in [
        (9.662162162, 4.375, 4),
        (9.662162162, -1.625, 4),
        (6.662162162, 4.375, 7),
        (9.662162162, 1.375, 7),
        (9.662162162, 1.375, 1),
        (6.662162162, 4.375, 1),
        (3.662162162, 4.375, 4),
    ]]
    fillet(fillet_14_edges, radius=FILLET_14_R)

    # 圆角15
    # the kernel refuses this fillet: 0.5 mm, written as the material it takes off along each edge
    with BuildSketch(Plane(origin=(4.162162162, 3.875, 1.5), x_dir=(0, 0, -1), z_dir=(-1, 0, 0))) as fillet_15_piece_1_section:
        Polygon((0, 0), (FILLET_15_R * 1.02, 0), (FILLET_15_R * 1.02, -FILLET_15_R * 1.02), (0, -FILLET_15_R * 1.02), align=None)
    fillet_15_piece_1 = extrude(amount=FILLET_15_R * 1.02, mode=Mode.PRIVATE)
    fillet_15_piece_1 = fillet_15_piece_1 - Plane(origin=(4.162162162, 3.875, 1.5), x_dir=(0, -0.7071067811865475, 0.7071067811865475), z_dir=(-1, 0, 0)) * Sphere(FILLET_15_R, mode=Mode.PRIVATE)
    add(fillet_15_piece_1, mode=Mode.SUBTRACT)
    with BuildSketch(Plane(origin=(9.162162162, -1.125, 6.5), x_dir=(0, -1, 0), z_dir=(0, 0, 1))) as fillet_15_piece_2_section:
        Polygon((0, 0), (FILLET_15_R * 1.02, 0), (FILLET_15_R * 1.02, FILLET_15_R * 1.02), (0, FILLET_15_R * 1.02), align=None)
    fillet_15_piece_2 = extrude(amount=FILLET_15_R * 1.02, mode=Mode.PRIVATE)
    fillet_15_piece_2 = fillet_15_piece_2 - Plane(origin=(9.162162162, -1.125, 6.5), x_dir=(-0.7071067811865475, 0.7071067811865475, 0), z_dir=(0, 0, 1)) * Sphere(FILLET_15_R, mode=Mode.PRIVATE)
    add(fillet_15_piece_2, mode=Mode.SUBTRACT)
    with BuildSketch(Plane(origin=(9.162162162, -1.125, 1.5), x_dir=(0, 0, -1), z_dir=(0, -1, 0))) as fillet_15_piece_3_section:
        Polygon((0, 0), (FILLET_15_R * 1.02, 0), (FILLET_15_R * 1.02, FILLET_15_R * 1.02), (0, FILLET_15_R * 1.02), align=None)
    fillet_15_piece_3 = extrude(amount=FILLET_15_R * 1.02, mode=Mode.PRIVATE)
    fillet_15_piece_3 = fillet_15_piece_3 - Plane(origin=(9.162162162, -1.125, 1.5), x_dir=(-0.7071067811865475, 0, 0.7071067811865475), z_dir=(0, -1, 0)) * Sphere(FILLET_15_R, mode=Mode.PRIVATE)
    add(fillet_15_piece_3, mode=Mode.SUBTRACT)
    with BuildSketch(Plane(origin=(3.662162162, 3, 1), x_dir=(0, 0, 1), z_dir=(0, 1, 0))) as fillet_15_piece_4:
        with BuildLine():
            CenterArc((FILLET_15_R, FILLET_15_R), FILLET_15_R, 180, 90)
            Line((0, FILLET_15_R), (0, 0))
            Line((0, 0), (FILLET_15_R, 0))
        make_face()
    extrude(amount=0.875, mode=Mode.SUBTRACT)
    with BuildSketch(Plane(origin=(3.662162162, -1.625, -0.25), x_dir=(0, 1, 0), z_dir=(0, 0, 1))) as fillet_15_piece_5:
        with BuildLine():
            CenterArc((FILLET_15_R, -FILLET_15_R), FILLET_15_R, 90, 90)
            Line((0, -FILLET_15_R), (0, 0))
            Line((0, 0), (FILLET_15_R, 0))
        make_face()
    extrude(amount=8.5, mode=Mode.SUBTRACT)
    with BuildSketch(Plane(origin=(2.412162162, -1.625, 7), x_dir=(0, 1, 0), z_dir=(1, 0, 0))) as fillet_15_piece_6:
        with BuildLine():
            CenterArc((FILLET_15_R, -FILLET_15_R), FILLET_15_R, 90, 90)
            Line((0, -FILLET_15_R), (0, 0))
            Line((0, 0), (FILLET_15_R, 0))
        make_face()
    extrude(amount=6.75, mode=Mode.SUBTRACT)
    with BuildSketch(Plane(origin=(9.162162162, -1.625, 1), x_dir=(0, 0, 1), z_dir=(-1, 0, 0))) as fillet_15_piece_7:
        with BuildLine():
            CenterArc((FILLET_15_R, FILLET_15_R), FILLET_15_R, 180, 90)
            Line((0, FILLET_15_R), (0, 0))
            Line((0, 0), (FILLET_15_R, 0))
        make_face()
    extrude(amount=6.75, mode=Mode.SUBTRACT)

    # 圆角16
    # the kernel refuses this fillet: 0.5 mm, written as the material it takes off along each edge
    with BuildSketch(Plane(origin=(4.162162162, 3.875, 6.5), x_dir=(-1, 0, 0), z_dir=(0, 0, 1))) as fillet_16_piece_1_section:
        Polygon((0, 0), (FILLET_16_R * 1.02, 0), (FILLET_16_R * 1.02, -FILLET_16_R * 1.02), (0, -FILLET_16_R * 1.02), align=None)
    fillet_16_piece_1 = extrude(amount=FILLET_16_R * 1.02, mode=Mode.PRIVATE)
    fillet_16_piece_1 = fillet_16_piece_1 - Plane(origin=(4.162162162, 3.875, 6.5), x_dir=(0.7071067811865475, -0.7071067811865475, 0), z_dir=(0, 0, 1)) * Sphere(FILLET_16_R, mode=Mode.PRIVATE)
    add(fillet_16_piece_1, mode=Mode.SUBTRACT)
    with BuildSketch(Plane(origin=(4.162162162, -1.125, 1.5), x_dir=(0, 0, -1), z_dir=(-1, 0, 0))) as fillet_16_piece_2_section:
        Polygon((0, 0), (FILLET_16_R * 1.02, 0), (FILLET_16_R * 1.02, FILLET_16_R * 1.02), (0, FILLET_16_R * 1.02), align=None)
    fillet_16_piece_2 = extrude(amount=FILLET_16_R * 1.02, mode=Mode.PRIVATE)
    fillet_16_piece_2 = fillet_16_piece_2 - Plane(origin=(4.162162162, -1.125, 1.5), x_dir=(0, 0.7071067811865475, 0.7071067811865475), z_dir=(-1, 0, 0)) * Sphere(FILLET_16_R, mode=Mode.PRIVATE)
    add(fillet_16_piece_2, mode=Mode.SUBTRACT)
    with BuildSketch(Plane(origin=(4.162162162, -1.125, 6.5), x_dir=(-1, 0, 0), z_dir=(0, 0, 1))) as fillet_16_piece_3_section:
        Polygon((0, 0), (FILLET_16_R * 1.02, 0), (FILLET_16_R * 1.02, FILLET_16_R * 1.02), (0, FILLET_16_R * 1.02), align=None)
    fillet_16_piece_3 = extrude(amount=FILLET_16_R * 1.02, mode=Mode.PRIVATE)
    fillet_16_piece_3 = fillet_16_piece_3 - Plane(origin=(4.162162162, -1.125, 6.5), x_dir=(0.7071067811865475, 0.7071067811865475, 0), z_dir=(0, 0, 1)) * Sphere(FILLET_16_R, mode=Mode.PRIVATE)
    add(fillet_16_piece_3, mode=Mode.SUBTRACT)
    with BuildSketch(Plane(origin=(3.662162162, 3, 7), x_dir=(1, 0, 0), z_dir=(0, 1, 0))) as fillet_16_piece_4:
        with BuildLine():
            CenterArc((FILLET_16_R, FILLET_16_R), FILLET_16_R, 180, 90)
            Line((0, FILLET_16_R), (0, 0))
            Line((0, 0), (FILLET_16_R, 0))
        make_face()
    extrude(amount=0.875, mode=Mode.SUBTRACT)
    with BuildSketch(Plane(origin=(3.662162162, -1.125, 1), x_dir=(0, 0, 1), z_dir=(0, 1, 0)), Plane(origin=(3.662162162, -1.125, 7), x_dir=(1, 0, 0), z_dir=(0, 1, 0))) as fillet_16_piece_5:
        with BuildLine():
            CenterArc((FILLET_16_R, FILLET_16_R), FILLET_16_R, 180, 90)
            Line((0, FILLET_16_R), (0, 0))
            Line((0, 0), (FILLET_16_R, 0))
        make_face()
    extrude(amount=1.125, mode=Mode.SUBTRACT)

    # 圆角18
    fillet_18_edges = [part.edges().sort_by_distance(p)[0] for p in [
        (-2.337837838, 3.6875, 7),
        (-2.337837838, 3.6875, 1),
        (-2.337837838, -0.8125, 7),
        (-2.337837838, -0.8125, 1),
        (1.662162162, -0.8125, 1),
    ]]
    fillet(fillet_18_edges, radius=FILLET_18_R)

    # 圆角19
    fillet_19_edges = [part.edges().sort_by_distance(p)[0] for p in [
        (1.662162162, -0.8125, 7),
    ]]
    fillet(fillet_19_edges, radius=FILLET_19_R)

    # 圆角20
    fillet_20_edges = [part.edges().sort_by_distance(p)[0] for p in [
        (-0.087837838, 4.375, 7),
        (1.662162162, 3.6875, 1),
        (1.662162162, 3.6875, 7),
        (-0.087837838, 4.375, 1),
        (-0.337837838, -1.625, 1),
        (-2.337837838, -1.625, 4),
        (-0.337837838, -1.625, 7),
        (-2.191391228, -1.625, 6.853553391),
        (-2.191391228, -1.625, 1.146446609),
        (1.515715553, -1.625, 1.146446609),
        (-2.337837838, 4.375, 4),
        (-2.191391228, 4.375, 6.853553391),
        (-2.191391228, 4.375, 1.146446609),
        (1.662162162, -1.625, 4),
        (1.515715553, -1.625, 6.853553391),
        (1.662162162, 4.375, 4),
    ]]
    fillet(fillet_20_edges, radius=FILLET_20_R)


solid = part.part
